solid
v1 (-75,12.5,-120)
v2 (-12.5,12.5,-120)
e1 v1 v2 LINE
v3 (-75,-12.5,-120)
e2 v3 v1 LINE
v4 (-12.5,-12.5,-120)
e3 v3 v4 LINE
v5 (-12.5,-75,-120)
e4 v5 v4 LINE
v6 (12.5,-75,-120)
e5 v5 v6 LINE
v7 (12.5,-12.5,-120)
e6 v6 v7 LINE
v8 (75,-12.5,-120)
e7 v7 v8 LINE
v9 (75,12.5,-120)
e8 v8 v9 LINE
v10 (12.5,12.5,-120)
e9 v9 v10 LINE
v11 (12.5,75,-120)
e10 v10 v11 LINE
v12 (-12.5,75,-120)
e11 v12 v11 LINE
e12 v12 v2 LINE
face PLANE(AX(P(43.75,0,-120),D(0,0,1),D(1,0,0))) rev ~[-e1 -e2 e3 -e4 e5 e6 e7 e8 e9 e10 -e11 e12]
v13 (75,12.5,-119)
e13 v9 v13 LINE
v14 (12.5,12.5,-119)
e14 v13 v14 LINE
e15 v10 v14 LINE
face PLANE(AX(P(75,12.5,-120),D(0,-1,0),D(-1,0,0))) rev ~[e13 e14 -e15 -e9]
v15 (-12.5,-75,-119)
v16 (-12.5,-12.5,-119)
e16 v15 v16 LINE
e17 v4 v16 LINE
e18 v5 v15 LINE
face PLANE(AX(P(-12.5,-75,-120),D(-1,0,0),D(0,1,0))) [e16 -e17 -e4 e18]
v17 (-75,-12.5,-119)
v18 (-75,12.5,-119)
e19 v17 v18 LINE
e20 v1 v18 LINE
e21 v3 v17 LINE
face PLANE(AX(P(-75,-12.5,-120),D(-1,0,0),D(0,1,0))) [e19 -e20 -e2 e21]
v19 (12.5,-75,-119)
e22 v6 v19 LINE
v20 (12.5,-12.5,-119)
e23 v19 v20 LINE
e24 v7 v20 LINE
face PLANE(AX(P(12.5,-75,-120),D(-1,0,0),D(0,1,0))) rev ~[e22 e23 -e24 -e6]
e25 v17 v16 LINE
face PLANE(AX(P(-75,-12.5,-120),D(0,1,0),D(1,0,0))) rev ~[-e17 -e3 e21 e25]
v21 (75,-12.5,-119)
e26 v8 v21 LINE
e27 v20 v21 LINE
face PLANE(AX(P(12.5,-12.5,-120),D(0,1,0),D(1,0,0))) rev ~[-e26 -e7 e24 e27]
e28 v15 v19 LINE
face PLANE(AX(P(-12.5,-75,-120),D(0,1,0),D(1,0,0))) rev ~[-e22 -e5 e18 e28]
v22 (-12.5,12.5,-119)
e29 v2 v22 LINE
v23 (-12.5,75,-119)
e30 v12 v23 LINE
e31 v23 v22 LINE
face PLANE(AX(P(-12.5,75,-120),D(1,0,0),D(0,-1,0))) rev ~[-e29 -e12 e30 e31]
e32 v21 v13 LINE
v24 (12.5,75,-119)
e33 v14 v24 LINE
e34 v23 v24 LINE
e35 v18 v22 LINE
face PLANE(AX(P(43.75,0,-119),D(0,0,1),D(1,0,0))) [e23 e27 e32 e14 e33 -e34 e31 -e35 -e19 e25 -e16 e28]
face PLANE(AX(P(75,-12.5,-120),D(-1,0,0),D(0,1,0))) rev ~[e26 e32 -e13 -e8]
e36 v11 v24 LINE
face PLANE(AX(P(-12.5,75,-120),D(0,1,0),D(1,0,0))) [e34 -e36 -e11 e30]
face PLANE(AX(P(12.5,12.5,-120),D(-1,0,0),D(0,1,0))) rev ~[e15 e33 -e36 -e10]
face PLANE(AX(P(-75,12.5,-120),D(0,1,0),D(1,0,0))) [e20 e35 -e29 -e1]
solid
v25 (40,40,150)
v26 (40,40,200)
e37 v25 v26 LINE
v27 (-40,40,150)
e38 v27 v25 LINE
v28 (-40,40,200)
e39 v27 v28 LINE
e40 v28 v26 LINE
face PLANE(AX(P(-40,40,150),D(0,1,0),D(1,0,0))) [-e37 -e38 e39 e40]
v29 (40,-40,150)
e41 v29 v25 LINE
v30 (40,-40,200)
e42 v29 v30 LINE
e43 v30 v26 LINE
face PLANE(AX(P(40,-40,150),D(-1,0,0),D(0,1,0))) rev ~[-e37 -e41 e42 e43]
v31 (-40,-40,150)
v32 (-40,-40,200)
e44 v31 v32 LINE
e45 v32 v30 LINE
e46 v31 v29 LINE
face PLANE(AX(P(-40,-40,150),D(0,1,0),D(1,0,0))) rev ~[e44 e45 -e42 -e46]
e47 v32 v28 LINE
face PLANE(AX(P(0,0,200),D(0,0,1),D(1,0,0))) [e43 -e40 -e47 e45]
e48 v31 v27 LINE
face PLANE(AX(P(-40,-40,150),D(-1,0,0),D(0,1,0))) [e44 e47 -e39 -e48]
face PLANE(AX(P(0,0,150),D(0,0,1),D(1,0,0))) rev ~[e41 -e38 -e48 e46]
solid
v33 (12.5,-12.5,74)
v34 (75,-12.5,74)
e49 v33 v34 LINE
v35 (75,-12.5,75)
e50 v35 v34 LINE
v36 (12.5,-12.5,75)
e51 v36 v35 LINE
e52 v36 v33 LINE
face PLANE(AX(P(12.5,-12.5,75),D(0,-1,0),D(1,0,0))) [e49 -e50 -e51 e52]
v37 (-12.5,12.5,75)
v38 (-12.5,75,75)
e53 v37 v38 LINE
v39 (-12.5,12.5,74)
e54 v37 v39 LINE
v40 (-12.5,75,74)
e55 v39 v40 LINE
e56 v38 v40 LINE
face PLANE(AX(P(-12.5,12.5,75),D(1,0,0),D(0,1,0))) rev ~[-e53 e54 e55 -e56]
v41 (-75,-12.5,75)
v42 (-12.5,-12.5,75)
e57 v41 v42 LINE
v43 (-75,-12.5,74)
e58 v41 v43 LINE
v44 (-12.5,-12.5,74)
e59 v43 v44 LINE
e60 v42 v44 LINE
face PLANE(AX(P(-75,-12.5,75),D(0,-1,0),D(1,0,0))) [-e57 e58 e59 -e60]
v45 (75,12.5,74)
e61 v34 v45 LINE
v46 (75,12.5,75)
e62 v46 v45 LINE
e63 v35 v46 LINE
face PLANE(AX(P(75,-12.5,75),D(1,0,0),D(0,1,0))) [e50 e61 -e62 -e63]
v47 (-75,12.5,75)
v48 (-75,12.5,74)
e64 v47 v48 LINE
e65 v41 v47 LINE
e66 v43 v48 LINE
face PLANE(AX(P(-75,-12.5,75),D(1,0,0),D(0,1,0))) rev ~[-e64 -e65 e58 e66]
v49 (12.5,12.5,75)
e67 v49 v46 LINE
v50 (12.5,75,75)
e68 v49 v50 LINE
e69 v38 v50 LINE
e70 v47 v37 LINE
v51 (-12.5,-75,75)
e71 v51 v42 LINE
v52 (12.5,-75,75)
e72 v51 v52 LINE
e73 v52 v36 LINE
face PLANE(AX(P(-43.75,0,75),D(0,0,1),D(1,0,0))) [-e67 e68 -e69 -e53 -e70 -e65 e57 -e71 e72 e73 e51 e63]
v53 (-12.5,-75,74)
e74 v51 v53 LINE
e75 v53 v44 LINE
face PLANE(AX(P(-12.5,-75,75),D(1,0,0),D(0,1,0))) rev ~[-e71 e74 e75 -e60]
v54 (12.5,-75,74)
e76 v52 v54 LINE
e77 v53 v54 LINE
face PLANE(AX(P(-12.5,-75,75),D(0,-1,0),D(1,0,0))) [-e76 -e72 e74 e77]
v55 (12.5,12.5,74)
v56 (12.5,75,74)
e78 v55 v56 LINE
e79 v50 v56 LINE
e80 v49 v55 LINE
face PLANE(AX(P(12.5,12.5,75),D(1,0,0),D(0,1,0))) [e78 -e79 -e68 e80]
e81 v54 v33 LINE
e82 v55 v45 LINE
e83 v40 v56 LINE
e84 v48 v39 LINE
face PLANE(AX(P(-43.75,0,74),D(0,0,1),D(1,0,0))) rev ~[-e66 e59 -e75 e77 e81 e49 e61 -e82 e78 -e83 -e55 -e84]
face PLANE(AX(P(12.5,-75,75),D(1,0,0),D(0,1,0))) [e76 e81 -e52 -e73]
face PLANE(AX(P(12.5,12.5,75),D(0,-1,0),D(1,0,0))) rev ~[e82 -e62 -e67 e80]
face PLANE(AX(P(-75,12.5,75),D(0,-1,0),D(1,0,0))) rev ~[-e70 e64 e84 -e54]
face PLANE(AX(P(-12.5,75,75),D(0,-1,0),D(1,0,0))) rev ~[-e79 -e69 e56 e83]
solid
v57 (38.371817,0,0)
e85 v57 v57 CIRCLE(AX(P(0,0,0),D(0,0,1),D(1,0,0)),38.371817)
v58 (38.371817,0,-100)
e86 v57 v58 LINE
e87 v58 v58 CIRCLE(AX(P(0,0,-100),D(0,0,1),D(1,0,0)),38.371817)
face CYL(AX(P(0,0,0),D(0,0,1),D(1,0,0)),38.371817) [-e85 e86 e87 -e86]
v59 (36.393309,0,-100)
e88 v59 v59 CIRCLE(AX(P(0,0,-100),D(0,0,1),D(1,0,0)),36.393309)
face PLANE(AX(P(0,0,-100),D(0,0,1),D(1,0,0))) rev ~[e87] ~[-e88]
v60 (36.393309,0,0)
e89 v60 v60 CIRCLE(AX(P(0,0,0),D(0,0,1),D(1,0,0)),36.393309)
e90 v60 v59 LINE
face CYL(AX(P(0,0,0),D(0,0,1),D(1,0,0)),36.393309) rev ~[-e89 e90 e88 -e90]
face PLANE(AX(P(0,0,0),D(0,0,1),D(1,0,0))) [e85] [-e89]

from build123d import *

# Parameters (mm, degrees)
F0_R      = 38.3718169686
F1_DEPTH  = 100
F2_R      = 36.3933090035
F3_DEPTH  = 100
F5_W      = 80
F5_H      = 80
F6_DEPTH  = 50
F11_W     = 62.5
F11_H     = 25
F11_W_2   = 25
F11_H_2   = 62.5
F12_DEPTH = 1
F14_W     = 62.5
F14_H     = 25
F14_W_2   = 25
F14_H_2   = 62.5
F15_DEPTH = 1


# Not quite as in the source:
# - the program builds the solid bodies; features that only make, move or delete a surface that nothing else refers to are left out


with BuildPart() as f1:
    # F0 (on Top) → F1 (new body)
    with BuildSketch(Plane.XY):
        Circle(F0_R)
    extrude(amount=-F1_DEPTH)

    # F2 (on face) → F3 (cut)
    with BuildSketch(Plane.XY):
        Circle(F2_R)
    extrude(amount=-F3_DEPTH, mode=Mode.SUBTRACT)


with BuildPart() as f6:
    # F5 (on offset) → F6 (new body)
    with BuildSketch(Plane.XY.offset(150)):
        Rectangle(F5_W, F5_H)
    extrude(amount=F6_DEPTH)


with BuildPart() as f12:
    # F11 (on offset) → F12 (new body)
    with BuildSketch(Plane.XY.offset(75)):
        with Locations((-43.75, 0)):
            Rectangle(F11_W, F11_H)
        with Locations((0, 43.75)):
            Rectangle(F11_W_2, F11_H_2)
        Rectangle(F11_W_2, F11_H)
        with Locations((43.75, 0)):
            Rectangle(F11_W, F11_H)
        with Locations((0, -43.75)):
            Rectangle(F11_W_2, F11_H_2)
    extrude(amount=-F12_DEPTH)


with BuildPart() as f15:
    # F14 (on offset) → F15 (new body)
    with BuildSketch(Plane.XY.offset(-120)):
        with Locations((43.75, 0)):
            Rectangle(F14_W, F14_H)
        Rectangle(F14_W_2, F14_H)
        with Locations((0, 43.75)):
            Rectangle(F14_W_2, F14_H_2)
        with Locations((-43.75, 0)):
            Rectangle(F14_W, F14_H)
        with Locations((0, -43.75)):
            Rectangle(F14_W_2, F14_H_2)
    extrude(amount=F15_DEPTH)


solid = Compound([f1.part, f6.part, f12.part, f15.part])
